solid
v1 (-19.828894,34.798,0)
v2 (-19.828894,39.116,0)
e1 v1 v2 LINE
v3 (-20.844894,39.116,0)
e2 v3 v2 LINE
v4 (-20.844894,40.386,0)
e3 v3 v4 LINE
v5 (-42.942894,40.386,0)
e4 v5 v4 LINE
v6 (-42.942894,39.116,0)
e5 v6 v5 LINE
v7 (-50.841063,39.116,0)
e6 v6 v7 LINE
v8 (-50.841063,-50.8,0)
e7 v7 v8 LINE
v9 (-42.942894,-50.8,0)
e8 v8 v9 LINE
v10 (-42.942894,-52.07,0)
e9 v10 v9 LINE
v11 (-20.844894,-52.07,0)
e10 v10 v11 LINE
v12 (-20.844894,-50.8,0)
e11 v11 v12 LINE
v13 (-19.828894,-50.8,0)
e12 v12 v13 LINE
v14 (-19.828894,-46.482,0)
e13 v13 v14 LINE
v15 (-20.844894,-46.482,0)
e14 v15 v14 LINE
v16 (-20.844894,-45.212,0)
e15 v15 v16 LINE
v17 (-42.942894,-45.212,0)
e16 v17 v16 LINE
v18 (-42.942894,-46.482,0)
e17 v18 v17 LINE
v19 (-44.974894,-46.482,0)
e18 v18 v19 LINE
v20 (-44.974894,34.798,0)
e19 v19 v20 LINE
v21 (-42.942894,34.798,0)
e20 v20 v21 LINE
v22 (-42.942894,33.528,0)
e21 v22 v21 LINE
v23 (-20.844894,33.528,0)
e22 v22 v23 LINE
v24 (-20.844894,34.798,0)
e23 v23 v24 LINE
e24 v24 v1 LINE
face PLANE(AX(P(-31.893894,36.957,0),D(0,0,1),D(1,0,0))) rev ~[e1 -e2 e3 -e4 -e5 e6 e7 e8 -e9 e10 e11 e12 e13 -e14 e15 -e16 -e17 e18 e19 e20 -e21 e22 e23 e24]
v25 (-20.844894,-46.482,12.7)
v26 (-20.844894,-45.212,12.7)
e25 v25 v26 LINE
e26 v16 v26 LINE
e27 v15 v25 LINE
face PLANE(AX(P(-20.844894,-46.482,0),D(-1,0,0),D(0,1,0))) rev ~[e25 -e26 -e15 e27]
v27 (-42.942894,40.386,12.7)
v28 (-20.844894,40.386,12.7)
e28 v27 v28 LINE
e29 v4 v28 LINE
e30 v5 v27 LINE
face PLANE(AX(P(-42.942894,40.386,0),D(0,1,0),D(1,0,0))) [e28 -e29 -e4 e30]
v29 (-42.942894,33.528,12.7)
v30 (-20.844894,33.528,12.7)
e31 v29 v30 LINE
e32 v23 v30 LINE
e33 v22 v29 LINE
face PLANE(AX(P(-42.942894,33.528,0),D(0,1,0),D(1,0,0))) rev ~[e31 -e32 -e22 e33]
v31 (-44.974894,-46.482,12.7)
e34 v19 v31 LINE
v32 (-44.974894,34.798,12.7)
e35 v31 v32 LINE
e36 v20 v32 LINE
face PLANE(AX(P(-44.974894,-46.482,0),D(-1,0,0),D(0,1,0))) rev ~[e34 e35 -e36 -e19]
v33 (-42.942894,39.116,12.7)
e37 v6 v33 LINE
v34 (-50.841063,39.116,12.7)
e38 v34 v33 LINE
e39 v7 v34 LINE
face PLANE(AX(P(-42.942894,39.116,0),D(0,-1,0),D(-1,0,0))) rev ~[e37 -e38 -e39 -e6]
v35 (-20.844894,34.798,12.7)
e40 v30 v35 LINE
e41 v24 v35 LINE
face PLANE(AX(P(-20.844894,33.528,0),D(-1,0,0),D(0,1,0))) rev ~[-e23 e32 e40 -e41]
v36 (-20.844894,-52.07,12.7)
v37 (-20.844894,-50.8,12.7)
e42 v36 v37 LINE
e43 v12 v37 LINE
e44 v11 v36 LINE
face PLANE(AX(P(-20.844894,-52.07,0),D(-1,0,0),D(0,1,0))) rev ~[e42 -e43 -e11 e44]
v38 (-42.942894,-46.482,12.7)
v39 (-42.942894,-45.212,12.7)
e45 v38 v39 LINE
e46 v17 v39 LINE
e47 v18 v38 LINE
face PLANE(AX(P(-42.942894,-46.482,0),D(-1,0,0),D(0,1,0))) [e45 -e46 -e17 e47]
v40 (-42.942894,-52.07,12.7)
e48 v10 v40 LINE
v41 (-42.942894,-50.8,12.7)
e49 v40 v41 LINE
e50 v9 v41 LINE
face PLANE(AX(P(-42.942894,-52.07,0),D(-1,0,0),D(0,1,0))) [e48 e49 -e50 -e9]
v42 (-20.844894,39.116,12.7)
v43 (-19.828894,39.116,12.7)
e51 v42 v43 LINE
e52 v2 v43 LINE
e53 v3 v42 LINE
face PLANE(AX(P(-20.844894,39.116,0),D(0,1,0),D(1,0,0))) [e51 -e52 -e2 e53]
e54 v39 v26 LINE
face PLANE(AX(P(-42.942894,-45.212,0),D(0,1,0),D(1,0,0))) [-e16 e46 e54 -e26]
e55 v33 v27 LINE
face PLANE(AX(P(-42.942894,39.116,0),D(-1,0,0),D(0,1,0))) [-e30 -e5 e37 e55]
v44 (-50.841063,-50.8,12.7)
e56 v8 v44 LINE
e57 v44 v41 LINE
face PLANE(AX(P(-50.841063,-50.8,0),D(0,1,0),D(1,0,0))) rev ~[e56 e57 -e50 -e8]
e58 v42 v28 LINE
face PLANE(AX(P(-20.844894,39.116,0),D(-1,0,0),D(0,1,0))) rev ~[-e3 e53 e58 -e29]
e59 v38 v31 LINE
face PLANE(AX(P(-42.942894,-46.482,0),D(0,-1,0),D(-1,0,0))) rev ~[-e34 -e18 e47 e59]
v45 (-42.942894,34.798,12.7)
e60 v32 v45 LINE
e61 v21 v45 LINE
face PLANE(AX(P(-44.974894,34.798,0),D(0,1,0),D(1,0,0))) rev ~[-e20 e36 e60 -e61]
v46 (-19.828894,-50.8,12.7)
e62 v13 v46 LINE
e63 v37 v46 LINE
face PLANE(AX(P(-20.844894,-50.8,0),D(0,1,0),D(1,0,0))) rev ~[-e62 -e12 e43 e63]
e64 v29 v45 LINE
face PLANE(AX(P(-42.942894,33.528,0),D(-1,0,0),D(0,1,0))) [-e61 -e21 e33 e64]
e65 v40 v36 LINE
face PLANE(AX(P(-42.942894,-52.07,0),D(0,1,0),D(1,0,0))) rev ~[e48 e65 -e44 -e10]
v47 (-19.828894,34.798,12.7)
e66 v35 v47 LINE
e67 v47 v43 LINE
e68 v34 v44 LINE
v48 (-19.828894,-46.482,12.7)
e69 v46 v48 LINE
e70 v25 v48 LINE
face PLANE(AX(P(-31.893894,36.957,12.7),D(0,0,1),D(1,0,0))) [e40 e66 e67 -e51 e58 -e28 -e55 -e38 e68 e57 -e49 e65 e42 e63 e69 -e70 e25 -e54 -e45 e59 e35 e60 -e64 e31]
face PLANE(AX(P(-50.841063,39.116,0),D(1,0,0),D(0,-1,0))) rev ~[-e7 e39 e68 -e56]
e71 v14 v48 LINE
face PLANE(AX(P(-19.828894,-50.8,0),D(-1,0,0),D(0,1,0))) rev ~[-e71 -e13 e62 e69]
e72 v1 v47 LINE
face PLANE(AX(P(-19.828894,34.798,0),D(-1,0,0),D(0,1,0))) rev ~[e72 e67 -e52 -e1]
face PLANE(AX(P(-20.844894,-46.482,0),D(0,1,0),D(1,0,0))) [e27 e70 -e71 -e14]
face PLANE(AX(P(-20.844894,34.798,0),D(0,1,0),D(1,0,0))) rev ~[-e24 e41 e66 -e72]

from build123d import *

# Parameters (mm, degrees)
F0_W     = 22.098
F0_H     = 4.318
F0_W_2   = 2.032
F0_H_2   = 1.27
F0_W_3   = 1.016
F1_DEPTH = 12.7
F2_DEPTH = 12.7


# Not quite as in the source:
# - a feature names something its author has since deleted; it is built from what else it names


with BuildPart() as f1:
    # F0 (on Top) → F1 (new body)
    with BuildSketch(Plane.XY):
        with Locations((-31.8938936177, -48.641)):
            Rectangle(F0_W, F0_H)
        with Locations((-43.9588936177, -48.641)):
            Rectangle(F0_W_2, F0_H)
        with Locations((-31.8938936177, -51.435)):
            Rectangle(F0_W, F0_H_2)
        with Locations((-31.8938936177, -45.847)):
            Rectangle(F0_W, F0_H_2)
        with Locations((-20.3368936177, -48.641)):
            Rectangle(F0_W_3, F0_H)
        Polygon((-50.8410629748, -50.8), (-44.9748936177, -50.8), (-44.9748936177, -46.482), (-44.9748936177, 34.798), (-44.9748936177, 39.116), (-50.8410629748, 39.116), align=None)
    extrude(amount=F1_DEPTH)

    # F0 (on Top) → F2 (join)
    with BuildSketch(Plane.XY):
        with Locations((-31.8938936177, 36.957)):
            Rectangle(F0_W, F0_H)
        with Locations((-43.9588936177, 36.957)):
            Rectangle(F0_W_2, F0_H)
        with Locations((-31.8938936177, 34.163)):
            Rectangle(F0_W, F0_H_2)
        with Locations((-31.8938936177, 39.751)):
            Rectangle(F0_W, F0_H_2)
        with Locations((-20.3368936177, 36.957)):
            Rectangle(F0_W_3, F0_H)
    extrude(amount=F2_DEPTH)


solid = f1.part
